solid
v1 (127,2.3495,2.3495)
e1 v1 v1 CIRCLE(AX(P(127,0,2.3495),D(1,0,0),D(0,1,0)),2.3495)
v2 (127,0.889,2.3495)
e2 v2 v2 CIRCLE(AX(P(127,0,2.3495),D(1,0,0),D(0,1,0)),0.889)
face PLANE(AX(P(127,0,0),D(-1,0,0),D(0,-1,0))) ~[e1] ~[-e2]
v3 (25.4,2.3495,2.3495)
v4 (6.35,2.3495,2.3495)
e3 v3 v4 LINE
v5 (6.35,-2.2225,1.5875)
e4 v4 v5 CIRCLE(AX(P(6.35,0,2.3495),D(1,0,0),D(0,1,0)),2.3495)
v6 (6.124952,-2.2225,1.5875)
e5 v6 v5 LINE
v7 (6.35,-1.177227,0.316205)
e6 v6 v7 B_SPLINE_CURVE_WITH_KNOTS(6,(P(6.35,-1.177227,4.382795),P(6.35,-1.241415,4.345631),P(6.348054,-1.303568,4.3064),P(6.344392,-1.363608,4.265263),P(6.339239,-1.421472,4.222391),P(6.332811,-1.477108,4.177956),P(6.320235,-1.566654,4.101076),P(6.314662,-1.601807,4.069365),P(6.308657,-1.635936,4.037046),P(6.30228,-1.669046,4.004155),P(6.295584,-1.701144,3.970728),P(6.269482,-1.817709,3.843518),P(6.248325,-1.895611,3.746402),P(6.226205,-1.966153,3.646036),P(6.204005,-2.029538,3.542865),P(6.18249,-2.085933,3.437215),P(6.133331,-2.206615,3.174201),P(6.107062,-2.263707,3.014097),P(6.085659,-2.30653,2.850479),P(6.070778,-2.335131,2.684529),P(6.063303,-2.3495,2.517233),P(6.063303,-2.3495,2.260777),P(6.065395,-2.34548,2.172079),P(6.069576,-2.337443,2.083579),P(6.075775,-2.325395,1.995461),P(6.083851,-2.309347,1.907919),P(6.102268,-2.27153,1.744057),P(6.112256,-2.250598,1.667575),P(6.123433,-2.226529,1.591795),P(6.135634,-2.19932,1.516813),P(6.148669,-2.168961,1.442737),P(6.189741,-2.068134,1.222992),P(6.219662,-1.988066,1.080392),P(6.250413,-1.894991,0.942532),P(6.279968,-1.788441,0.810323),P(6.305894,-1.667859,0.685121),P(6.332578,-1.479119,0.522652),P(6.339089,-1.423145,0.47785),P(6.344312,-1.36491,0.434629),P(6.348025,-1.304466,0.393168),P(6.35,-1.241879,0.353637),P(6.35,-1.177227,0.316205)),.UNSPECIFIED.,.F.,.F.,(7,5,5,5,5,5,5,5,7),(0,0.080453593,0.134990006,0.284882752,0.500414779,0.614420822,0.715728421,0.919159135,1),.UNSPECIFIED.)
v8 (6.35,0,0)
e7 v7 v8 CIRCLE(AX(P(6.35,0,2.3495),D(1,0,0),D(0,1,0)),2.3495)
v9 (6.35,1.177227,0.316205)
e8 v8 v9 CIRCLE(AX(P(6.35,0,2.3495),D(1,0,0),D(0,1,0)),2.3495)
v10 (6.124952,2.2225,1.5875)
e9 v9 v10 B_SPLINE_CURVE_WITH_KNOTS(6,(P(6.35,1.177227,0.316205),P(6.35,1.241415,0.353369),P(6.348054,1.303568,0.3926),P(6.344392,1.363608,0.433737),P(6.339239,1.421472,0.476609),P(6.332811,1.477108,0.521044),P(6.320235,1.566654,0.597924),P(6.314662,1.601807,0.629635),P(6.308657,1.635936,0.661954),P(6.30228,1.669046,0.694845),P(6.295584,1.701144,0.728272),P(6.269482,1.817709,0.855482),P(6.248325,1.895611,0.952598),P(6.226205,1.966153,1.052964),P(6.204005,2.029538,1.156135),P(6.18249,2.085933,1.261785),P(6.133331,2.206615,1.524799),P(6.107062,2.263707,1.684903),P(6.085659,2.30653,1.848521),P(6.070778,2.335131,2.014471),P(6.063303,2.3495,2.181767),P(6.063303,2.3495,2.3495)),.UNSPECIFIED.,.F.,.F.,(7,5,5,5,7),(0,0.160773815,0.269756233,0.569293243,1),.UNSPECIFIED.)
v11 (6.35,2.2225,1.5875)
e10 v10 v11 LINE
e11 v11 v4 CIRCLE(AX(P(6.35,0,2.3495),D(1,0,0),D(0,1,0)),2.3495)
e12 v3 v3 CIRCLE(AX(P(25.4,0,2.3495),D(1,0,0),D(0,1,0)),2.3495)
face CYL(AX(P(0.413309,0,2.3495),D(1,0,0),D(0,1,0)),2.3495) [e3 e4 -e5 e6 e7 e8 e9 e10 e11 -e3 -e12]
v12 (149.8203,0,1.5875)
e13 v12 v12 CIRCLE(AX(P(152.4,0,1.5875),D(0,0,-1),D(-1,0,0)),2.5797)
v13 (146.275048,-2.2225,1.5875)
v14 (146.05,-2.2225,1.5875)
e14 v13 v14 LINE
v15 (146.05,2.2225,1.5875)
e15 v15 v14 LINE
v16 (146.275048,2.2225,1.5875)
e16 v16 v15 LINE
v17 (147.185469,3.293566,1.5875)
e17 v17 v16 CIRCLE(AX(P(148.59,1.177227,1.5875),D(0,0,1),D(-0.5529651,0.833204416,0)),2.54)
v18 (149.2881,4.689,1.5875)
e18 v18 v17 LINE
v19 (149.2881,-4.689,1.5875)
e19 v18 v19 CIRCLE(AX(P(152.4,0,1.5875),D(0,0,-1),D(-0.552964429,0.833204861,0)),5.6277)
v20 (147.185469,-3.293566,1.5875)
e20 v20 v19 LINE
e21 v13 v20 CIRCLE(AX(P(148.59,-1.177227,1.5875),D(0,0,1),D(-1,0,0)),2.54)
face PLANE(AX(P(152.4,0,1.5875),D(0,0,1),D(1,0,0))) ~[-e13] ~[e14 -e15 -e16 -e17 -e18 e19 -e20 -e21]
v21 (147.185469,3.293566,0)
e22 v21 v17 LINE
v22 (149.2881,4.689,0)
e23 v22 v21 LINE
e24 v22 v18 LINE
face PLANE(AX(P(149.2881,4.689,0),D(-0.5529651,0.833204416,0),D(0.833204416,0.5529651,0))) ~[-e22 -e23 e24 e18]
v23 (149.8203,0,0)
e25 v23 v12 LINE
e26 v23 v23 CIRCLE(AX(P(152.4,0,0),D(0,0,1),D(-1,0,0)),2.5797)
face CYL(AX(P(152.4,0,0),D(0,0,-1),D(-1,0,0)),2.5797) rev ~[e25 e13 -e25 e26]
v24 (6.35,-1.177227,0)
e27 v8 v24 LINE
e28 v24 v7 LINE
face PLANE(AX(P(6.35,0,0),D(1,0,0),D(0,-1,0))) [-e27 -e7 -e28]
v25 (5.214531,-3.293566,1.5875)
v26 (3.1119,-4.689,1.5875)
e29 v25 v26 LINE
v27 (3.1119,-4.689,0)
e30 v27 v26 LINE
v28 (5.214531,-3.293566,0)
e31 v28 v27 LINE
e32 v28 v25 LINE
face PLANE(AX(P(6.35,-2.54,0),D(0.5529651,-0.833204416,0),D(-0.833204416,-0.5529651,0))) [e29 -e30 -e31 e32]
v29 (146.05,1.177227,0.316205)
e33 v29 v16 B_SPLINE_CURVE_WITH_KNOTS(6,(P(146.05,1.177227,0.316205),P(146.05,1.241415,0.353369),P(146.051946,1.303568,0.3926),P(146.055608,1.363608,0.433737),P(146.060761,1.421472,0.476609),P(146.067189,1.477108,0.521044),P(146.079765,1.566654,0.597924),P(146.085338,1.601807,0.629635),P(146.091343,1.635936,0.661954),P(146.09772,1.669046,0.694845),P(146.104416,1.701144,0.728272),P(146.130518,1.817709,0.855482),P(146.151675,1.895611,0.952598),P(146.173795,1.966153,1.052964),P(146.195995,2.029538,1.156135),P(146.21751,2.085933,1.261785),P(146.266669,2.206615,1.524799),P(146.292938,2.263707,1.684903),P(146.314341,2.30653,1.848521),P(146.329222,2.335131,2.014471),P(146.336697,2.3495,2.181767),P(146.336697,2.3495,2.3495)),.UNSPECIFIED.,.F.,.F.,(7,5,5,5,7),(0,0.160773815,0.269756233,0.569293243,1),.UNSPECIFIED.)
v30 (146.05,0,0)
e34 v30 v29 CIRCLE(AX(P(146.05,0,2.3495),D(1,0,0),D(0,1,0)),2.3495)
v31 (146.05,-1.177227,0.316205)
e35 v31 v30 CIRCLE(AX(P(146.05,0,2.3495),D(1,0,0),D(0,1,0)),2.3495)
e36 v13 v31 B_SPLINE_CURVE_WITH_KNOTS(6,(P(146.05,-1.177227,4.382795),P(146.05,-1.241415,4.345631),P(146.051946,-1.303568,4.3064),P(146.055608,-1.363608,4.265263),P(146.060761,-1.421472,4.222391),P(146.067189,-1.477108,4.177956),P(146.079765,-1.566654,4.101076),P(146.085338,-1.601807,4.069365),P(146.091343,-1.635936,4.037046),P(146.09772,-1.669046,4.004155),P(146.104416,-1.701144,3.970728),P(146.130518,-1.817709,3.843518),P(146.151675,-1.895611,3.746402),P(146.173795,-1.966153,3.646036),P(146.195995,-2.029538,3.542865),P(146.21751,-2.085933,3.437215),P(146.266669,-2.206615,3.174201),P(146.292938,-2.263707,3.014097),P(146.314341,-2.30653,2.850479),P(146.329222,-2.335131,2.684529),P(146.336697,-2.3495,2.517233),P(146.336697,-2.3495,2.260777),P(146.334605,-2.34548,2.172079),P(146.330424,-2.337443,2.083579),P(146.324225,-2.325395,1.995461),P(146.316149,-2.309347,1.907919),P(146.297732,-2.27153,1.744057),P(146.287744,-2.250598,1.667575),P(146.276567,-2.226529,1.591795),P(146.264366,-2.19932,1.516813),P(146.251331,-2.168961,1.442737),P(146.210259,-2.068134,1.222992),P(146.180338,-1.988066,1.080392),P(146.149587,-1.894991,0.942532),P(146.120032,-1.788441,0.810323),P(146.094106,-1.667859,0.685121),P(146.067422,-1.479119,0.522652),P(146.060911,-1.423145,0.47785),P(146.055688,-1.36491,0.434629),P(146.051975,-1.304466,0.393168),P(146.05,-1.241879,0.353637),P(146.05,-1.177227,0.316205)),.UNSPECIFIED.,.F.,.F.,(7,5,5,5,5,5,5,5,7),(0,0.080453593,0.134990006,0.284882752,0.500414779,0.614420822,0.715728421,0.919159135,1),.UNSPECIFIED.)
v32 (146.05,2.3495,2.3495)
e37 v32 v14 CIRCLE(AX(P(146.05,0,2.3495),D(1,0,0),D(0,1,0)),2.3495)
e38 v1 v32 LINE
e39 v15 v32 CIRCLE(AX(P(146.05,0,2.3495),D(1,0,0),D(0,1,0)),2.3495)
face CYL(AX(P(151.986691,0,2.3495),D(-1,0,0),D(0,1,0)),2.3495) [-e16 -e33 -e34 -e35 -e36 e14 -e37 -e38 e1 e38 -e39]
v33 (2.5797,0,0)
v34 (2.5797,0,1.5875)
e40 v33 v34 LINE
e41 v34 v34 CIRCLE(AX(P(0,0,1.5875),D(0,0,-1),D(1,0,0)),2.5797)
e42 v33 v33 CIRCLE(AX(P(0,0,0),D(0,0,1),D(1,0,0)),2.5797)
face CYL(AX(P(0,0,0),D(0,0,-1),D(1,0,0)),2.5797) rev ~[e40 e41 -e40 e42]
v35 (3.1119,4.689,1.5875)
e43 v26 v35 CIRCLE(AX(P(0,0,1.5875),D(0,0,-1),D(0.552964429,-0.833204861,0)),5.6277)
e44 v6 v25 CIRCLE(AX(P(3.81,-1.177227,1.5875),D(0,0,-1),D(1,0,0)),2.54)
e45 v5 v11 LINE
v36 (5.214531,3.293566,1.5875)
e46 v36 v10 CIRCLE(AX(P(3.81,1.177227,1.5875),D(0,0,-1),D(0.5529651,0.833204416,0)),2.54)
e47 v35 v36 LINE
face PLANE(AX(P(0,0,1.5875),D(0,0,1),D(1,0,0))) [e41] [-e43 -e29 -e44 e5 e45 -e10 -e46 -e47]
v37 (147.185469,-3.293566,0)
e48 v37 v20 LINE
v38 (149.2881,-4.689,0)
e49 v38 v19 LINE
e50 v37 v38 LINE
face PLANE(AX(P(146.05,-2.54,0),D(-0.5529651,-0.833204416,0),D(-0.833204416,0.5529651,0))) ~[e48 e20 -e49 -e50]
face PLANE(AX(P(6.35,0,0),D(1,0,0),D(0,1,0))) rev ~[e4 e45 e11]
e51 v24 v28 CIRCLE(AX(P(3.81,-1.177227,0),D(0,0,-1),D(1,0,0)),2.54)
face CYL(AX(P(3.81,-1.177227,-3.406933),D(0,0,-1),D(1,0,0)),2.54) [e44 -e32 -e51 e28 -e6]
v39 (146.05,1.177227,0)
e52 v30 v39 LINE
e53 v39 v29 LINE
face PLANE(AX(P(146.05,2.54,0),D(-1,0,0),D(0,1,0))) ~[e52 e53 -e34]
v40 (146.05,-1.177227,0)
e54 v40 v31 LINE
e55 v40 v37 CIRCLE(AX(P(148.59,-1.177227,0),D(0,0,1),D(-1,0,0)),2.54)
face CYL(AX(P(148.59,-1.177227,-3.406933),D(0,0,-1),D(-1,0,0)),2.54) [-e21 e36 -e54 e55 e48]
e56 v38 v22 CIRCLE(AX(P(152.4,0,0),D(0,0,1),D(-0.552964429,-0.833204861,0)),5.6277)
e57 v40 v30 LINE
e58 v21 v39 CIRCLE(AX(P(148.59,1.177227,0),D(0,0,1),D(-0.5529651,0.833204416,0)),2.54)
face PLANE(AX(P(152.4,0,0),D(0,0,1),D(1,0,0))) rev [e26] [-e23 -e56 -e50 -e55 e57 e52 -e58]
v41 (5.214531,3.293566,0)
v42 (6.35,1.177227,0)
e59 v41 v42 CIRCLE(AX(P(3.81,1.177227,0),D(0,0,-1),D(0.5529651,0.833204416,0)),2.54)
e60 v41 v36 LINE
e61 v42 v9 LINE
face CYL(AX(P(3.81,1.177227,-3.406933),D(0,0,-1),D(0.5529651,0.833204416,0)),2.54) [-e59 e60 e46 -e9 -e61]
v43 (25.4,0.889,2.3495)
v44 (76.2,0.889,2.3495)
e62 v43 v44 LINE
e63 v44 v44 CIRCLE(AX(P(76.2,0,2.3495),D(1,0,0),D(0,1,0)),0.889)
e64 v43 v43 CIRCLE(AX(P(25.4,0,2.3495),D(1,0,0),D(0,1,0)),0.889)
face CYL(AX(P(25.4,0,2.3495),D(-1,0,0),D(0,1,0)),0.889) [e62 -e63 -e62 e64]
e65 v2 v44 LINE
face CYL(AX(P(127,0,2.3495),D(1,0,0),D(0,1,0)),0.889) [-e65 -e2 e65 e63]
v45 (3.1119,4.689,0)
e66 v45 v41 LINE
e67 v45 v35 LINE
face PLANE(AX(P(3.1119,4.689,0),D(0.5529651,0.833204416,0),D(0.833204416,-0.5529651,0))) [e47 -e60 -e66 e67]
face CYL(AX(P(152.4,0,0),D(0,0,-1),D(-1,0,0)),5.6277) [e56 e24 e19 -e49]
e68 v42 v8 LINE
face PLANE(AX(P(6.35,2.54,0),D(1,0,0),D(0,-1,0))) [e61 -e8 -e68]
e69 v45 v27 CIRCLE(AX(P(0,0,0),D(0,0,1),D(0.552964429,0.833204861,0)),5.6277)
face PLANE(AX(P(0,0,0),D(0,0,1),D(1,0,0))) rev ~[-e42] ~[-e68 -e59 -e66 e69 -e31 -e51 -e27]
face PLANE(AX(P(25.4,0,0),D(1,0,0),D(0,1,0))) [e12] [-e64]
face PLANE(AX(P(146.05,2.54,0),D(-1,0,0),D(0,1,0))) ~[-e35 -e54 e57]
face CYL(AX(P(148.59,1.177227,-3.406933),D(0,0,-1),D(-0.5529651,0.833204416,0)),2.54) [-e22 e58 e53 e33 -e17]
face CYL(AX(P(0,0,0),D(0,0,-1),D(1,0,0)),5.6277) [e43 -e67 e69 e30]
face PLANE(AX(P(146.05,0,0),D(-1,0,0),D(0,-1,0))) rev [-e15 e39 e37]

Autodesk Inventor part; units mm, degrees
ref_plane "XZ Plane" through (0, 0, 0) normal (0, 1, 0) x (-1, 0, 0)
sketch "Sketch1" plane through (0, 0, 0) normal (0, 0, 1) x (1, 0, 0)
  line L0 (0, 7.8788) -> (0, -7.8788) projected
  line L1 (-8.0232, 0) -> (8.7455, 0) projected
  circle A0 centre (0, 0) radius 2.5797
  circle A1 centre (0, 0) radius 5.6277
  line L2 (3.1119, 4.689) -> (6.35, 2.54)
  line L3 (6.35, 2.54) -> (6.35, -2.54)
  line L4 (6.35, -2.54) -> (3.1119, -4.689)
  dimension "d0" = 5.1594
  dimension "d1" = 3.048
  dimension "d8" = 6.35
  dimension "d9" = 5.08
extrude "Extrusion1" add sketch "Sketch1" along normal blind 1.5875 contours A1 L1 A0 L0 | L0 A0 L1 A1 | L2 L3 L1 A1 | L1 A0 L0 A1 | L1 A1 L0 A0 | L1 L3 L4 A1
sketch "Sketch2" plane through (0, 0, 0) normal (1, 0, 0) x (0, 1, 0)
  point P0 (0, 0)
ref_plane "Work Plane1" through (25.4, 0, 0) normal (1, 0, 0) x (0, 1, 0)
sketch "Sketch3" plane through (25.4, 0, 0) normal (1, 0, 0) x (0, 1, 0)
  circle A0 centre (0, 2.3495) radius 2.3495
  circle A1 centre (0, 2.3495) radius 0.762
  line L0 (5.6277, 1.5875) -> (-5.6277, 1.5875) projected
  point P0 (0, 0)
  dimension "d5" = 1.524
extrude "Extrusion2" add sketch "Sketch3" against normal blind 19.05 contours A1 | A0 L0 | L0 A0
fillet "Fillet1" radius 2.54 2 edges at (6.35, 2.54, 0.7937) (6.35, -2.54, 0.7937)
sketch "Sketch4" plane through (25.4, 0, 0) normal (1, 0, 0) x (0, 1, 0)
  circle A0 centre (0, 2.3495) radius 2.3495 projected
  circle A1 centre (0, 2.3495) radius 0.889
  point P0 (0, 0)
  dimension "d11" = 1.778
ref_plane "Work Plane2" through (76.2, 0, 0) normal (1, 0, 0) x (0, 1, 0)
extrude "Extrusion3" add sketch "Sketch4" along normal up to surface (50.8 mm away) contours A1
mirror "Mirror1" about plane through (76.2, 0, 0) normal (1, 0, 0) of "Extrusion3", "Extrusion2", "Fillet1", "Extrusion1"
